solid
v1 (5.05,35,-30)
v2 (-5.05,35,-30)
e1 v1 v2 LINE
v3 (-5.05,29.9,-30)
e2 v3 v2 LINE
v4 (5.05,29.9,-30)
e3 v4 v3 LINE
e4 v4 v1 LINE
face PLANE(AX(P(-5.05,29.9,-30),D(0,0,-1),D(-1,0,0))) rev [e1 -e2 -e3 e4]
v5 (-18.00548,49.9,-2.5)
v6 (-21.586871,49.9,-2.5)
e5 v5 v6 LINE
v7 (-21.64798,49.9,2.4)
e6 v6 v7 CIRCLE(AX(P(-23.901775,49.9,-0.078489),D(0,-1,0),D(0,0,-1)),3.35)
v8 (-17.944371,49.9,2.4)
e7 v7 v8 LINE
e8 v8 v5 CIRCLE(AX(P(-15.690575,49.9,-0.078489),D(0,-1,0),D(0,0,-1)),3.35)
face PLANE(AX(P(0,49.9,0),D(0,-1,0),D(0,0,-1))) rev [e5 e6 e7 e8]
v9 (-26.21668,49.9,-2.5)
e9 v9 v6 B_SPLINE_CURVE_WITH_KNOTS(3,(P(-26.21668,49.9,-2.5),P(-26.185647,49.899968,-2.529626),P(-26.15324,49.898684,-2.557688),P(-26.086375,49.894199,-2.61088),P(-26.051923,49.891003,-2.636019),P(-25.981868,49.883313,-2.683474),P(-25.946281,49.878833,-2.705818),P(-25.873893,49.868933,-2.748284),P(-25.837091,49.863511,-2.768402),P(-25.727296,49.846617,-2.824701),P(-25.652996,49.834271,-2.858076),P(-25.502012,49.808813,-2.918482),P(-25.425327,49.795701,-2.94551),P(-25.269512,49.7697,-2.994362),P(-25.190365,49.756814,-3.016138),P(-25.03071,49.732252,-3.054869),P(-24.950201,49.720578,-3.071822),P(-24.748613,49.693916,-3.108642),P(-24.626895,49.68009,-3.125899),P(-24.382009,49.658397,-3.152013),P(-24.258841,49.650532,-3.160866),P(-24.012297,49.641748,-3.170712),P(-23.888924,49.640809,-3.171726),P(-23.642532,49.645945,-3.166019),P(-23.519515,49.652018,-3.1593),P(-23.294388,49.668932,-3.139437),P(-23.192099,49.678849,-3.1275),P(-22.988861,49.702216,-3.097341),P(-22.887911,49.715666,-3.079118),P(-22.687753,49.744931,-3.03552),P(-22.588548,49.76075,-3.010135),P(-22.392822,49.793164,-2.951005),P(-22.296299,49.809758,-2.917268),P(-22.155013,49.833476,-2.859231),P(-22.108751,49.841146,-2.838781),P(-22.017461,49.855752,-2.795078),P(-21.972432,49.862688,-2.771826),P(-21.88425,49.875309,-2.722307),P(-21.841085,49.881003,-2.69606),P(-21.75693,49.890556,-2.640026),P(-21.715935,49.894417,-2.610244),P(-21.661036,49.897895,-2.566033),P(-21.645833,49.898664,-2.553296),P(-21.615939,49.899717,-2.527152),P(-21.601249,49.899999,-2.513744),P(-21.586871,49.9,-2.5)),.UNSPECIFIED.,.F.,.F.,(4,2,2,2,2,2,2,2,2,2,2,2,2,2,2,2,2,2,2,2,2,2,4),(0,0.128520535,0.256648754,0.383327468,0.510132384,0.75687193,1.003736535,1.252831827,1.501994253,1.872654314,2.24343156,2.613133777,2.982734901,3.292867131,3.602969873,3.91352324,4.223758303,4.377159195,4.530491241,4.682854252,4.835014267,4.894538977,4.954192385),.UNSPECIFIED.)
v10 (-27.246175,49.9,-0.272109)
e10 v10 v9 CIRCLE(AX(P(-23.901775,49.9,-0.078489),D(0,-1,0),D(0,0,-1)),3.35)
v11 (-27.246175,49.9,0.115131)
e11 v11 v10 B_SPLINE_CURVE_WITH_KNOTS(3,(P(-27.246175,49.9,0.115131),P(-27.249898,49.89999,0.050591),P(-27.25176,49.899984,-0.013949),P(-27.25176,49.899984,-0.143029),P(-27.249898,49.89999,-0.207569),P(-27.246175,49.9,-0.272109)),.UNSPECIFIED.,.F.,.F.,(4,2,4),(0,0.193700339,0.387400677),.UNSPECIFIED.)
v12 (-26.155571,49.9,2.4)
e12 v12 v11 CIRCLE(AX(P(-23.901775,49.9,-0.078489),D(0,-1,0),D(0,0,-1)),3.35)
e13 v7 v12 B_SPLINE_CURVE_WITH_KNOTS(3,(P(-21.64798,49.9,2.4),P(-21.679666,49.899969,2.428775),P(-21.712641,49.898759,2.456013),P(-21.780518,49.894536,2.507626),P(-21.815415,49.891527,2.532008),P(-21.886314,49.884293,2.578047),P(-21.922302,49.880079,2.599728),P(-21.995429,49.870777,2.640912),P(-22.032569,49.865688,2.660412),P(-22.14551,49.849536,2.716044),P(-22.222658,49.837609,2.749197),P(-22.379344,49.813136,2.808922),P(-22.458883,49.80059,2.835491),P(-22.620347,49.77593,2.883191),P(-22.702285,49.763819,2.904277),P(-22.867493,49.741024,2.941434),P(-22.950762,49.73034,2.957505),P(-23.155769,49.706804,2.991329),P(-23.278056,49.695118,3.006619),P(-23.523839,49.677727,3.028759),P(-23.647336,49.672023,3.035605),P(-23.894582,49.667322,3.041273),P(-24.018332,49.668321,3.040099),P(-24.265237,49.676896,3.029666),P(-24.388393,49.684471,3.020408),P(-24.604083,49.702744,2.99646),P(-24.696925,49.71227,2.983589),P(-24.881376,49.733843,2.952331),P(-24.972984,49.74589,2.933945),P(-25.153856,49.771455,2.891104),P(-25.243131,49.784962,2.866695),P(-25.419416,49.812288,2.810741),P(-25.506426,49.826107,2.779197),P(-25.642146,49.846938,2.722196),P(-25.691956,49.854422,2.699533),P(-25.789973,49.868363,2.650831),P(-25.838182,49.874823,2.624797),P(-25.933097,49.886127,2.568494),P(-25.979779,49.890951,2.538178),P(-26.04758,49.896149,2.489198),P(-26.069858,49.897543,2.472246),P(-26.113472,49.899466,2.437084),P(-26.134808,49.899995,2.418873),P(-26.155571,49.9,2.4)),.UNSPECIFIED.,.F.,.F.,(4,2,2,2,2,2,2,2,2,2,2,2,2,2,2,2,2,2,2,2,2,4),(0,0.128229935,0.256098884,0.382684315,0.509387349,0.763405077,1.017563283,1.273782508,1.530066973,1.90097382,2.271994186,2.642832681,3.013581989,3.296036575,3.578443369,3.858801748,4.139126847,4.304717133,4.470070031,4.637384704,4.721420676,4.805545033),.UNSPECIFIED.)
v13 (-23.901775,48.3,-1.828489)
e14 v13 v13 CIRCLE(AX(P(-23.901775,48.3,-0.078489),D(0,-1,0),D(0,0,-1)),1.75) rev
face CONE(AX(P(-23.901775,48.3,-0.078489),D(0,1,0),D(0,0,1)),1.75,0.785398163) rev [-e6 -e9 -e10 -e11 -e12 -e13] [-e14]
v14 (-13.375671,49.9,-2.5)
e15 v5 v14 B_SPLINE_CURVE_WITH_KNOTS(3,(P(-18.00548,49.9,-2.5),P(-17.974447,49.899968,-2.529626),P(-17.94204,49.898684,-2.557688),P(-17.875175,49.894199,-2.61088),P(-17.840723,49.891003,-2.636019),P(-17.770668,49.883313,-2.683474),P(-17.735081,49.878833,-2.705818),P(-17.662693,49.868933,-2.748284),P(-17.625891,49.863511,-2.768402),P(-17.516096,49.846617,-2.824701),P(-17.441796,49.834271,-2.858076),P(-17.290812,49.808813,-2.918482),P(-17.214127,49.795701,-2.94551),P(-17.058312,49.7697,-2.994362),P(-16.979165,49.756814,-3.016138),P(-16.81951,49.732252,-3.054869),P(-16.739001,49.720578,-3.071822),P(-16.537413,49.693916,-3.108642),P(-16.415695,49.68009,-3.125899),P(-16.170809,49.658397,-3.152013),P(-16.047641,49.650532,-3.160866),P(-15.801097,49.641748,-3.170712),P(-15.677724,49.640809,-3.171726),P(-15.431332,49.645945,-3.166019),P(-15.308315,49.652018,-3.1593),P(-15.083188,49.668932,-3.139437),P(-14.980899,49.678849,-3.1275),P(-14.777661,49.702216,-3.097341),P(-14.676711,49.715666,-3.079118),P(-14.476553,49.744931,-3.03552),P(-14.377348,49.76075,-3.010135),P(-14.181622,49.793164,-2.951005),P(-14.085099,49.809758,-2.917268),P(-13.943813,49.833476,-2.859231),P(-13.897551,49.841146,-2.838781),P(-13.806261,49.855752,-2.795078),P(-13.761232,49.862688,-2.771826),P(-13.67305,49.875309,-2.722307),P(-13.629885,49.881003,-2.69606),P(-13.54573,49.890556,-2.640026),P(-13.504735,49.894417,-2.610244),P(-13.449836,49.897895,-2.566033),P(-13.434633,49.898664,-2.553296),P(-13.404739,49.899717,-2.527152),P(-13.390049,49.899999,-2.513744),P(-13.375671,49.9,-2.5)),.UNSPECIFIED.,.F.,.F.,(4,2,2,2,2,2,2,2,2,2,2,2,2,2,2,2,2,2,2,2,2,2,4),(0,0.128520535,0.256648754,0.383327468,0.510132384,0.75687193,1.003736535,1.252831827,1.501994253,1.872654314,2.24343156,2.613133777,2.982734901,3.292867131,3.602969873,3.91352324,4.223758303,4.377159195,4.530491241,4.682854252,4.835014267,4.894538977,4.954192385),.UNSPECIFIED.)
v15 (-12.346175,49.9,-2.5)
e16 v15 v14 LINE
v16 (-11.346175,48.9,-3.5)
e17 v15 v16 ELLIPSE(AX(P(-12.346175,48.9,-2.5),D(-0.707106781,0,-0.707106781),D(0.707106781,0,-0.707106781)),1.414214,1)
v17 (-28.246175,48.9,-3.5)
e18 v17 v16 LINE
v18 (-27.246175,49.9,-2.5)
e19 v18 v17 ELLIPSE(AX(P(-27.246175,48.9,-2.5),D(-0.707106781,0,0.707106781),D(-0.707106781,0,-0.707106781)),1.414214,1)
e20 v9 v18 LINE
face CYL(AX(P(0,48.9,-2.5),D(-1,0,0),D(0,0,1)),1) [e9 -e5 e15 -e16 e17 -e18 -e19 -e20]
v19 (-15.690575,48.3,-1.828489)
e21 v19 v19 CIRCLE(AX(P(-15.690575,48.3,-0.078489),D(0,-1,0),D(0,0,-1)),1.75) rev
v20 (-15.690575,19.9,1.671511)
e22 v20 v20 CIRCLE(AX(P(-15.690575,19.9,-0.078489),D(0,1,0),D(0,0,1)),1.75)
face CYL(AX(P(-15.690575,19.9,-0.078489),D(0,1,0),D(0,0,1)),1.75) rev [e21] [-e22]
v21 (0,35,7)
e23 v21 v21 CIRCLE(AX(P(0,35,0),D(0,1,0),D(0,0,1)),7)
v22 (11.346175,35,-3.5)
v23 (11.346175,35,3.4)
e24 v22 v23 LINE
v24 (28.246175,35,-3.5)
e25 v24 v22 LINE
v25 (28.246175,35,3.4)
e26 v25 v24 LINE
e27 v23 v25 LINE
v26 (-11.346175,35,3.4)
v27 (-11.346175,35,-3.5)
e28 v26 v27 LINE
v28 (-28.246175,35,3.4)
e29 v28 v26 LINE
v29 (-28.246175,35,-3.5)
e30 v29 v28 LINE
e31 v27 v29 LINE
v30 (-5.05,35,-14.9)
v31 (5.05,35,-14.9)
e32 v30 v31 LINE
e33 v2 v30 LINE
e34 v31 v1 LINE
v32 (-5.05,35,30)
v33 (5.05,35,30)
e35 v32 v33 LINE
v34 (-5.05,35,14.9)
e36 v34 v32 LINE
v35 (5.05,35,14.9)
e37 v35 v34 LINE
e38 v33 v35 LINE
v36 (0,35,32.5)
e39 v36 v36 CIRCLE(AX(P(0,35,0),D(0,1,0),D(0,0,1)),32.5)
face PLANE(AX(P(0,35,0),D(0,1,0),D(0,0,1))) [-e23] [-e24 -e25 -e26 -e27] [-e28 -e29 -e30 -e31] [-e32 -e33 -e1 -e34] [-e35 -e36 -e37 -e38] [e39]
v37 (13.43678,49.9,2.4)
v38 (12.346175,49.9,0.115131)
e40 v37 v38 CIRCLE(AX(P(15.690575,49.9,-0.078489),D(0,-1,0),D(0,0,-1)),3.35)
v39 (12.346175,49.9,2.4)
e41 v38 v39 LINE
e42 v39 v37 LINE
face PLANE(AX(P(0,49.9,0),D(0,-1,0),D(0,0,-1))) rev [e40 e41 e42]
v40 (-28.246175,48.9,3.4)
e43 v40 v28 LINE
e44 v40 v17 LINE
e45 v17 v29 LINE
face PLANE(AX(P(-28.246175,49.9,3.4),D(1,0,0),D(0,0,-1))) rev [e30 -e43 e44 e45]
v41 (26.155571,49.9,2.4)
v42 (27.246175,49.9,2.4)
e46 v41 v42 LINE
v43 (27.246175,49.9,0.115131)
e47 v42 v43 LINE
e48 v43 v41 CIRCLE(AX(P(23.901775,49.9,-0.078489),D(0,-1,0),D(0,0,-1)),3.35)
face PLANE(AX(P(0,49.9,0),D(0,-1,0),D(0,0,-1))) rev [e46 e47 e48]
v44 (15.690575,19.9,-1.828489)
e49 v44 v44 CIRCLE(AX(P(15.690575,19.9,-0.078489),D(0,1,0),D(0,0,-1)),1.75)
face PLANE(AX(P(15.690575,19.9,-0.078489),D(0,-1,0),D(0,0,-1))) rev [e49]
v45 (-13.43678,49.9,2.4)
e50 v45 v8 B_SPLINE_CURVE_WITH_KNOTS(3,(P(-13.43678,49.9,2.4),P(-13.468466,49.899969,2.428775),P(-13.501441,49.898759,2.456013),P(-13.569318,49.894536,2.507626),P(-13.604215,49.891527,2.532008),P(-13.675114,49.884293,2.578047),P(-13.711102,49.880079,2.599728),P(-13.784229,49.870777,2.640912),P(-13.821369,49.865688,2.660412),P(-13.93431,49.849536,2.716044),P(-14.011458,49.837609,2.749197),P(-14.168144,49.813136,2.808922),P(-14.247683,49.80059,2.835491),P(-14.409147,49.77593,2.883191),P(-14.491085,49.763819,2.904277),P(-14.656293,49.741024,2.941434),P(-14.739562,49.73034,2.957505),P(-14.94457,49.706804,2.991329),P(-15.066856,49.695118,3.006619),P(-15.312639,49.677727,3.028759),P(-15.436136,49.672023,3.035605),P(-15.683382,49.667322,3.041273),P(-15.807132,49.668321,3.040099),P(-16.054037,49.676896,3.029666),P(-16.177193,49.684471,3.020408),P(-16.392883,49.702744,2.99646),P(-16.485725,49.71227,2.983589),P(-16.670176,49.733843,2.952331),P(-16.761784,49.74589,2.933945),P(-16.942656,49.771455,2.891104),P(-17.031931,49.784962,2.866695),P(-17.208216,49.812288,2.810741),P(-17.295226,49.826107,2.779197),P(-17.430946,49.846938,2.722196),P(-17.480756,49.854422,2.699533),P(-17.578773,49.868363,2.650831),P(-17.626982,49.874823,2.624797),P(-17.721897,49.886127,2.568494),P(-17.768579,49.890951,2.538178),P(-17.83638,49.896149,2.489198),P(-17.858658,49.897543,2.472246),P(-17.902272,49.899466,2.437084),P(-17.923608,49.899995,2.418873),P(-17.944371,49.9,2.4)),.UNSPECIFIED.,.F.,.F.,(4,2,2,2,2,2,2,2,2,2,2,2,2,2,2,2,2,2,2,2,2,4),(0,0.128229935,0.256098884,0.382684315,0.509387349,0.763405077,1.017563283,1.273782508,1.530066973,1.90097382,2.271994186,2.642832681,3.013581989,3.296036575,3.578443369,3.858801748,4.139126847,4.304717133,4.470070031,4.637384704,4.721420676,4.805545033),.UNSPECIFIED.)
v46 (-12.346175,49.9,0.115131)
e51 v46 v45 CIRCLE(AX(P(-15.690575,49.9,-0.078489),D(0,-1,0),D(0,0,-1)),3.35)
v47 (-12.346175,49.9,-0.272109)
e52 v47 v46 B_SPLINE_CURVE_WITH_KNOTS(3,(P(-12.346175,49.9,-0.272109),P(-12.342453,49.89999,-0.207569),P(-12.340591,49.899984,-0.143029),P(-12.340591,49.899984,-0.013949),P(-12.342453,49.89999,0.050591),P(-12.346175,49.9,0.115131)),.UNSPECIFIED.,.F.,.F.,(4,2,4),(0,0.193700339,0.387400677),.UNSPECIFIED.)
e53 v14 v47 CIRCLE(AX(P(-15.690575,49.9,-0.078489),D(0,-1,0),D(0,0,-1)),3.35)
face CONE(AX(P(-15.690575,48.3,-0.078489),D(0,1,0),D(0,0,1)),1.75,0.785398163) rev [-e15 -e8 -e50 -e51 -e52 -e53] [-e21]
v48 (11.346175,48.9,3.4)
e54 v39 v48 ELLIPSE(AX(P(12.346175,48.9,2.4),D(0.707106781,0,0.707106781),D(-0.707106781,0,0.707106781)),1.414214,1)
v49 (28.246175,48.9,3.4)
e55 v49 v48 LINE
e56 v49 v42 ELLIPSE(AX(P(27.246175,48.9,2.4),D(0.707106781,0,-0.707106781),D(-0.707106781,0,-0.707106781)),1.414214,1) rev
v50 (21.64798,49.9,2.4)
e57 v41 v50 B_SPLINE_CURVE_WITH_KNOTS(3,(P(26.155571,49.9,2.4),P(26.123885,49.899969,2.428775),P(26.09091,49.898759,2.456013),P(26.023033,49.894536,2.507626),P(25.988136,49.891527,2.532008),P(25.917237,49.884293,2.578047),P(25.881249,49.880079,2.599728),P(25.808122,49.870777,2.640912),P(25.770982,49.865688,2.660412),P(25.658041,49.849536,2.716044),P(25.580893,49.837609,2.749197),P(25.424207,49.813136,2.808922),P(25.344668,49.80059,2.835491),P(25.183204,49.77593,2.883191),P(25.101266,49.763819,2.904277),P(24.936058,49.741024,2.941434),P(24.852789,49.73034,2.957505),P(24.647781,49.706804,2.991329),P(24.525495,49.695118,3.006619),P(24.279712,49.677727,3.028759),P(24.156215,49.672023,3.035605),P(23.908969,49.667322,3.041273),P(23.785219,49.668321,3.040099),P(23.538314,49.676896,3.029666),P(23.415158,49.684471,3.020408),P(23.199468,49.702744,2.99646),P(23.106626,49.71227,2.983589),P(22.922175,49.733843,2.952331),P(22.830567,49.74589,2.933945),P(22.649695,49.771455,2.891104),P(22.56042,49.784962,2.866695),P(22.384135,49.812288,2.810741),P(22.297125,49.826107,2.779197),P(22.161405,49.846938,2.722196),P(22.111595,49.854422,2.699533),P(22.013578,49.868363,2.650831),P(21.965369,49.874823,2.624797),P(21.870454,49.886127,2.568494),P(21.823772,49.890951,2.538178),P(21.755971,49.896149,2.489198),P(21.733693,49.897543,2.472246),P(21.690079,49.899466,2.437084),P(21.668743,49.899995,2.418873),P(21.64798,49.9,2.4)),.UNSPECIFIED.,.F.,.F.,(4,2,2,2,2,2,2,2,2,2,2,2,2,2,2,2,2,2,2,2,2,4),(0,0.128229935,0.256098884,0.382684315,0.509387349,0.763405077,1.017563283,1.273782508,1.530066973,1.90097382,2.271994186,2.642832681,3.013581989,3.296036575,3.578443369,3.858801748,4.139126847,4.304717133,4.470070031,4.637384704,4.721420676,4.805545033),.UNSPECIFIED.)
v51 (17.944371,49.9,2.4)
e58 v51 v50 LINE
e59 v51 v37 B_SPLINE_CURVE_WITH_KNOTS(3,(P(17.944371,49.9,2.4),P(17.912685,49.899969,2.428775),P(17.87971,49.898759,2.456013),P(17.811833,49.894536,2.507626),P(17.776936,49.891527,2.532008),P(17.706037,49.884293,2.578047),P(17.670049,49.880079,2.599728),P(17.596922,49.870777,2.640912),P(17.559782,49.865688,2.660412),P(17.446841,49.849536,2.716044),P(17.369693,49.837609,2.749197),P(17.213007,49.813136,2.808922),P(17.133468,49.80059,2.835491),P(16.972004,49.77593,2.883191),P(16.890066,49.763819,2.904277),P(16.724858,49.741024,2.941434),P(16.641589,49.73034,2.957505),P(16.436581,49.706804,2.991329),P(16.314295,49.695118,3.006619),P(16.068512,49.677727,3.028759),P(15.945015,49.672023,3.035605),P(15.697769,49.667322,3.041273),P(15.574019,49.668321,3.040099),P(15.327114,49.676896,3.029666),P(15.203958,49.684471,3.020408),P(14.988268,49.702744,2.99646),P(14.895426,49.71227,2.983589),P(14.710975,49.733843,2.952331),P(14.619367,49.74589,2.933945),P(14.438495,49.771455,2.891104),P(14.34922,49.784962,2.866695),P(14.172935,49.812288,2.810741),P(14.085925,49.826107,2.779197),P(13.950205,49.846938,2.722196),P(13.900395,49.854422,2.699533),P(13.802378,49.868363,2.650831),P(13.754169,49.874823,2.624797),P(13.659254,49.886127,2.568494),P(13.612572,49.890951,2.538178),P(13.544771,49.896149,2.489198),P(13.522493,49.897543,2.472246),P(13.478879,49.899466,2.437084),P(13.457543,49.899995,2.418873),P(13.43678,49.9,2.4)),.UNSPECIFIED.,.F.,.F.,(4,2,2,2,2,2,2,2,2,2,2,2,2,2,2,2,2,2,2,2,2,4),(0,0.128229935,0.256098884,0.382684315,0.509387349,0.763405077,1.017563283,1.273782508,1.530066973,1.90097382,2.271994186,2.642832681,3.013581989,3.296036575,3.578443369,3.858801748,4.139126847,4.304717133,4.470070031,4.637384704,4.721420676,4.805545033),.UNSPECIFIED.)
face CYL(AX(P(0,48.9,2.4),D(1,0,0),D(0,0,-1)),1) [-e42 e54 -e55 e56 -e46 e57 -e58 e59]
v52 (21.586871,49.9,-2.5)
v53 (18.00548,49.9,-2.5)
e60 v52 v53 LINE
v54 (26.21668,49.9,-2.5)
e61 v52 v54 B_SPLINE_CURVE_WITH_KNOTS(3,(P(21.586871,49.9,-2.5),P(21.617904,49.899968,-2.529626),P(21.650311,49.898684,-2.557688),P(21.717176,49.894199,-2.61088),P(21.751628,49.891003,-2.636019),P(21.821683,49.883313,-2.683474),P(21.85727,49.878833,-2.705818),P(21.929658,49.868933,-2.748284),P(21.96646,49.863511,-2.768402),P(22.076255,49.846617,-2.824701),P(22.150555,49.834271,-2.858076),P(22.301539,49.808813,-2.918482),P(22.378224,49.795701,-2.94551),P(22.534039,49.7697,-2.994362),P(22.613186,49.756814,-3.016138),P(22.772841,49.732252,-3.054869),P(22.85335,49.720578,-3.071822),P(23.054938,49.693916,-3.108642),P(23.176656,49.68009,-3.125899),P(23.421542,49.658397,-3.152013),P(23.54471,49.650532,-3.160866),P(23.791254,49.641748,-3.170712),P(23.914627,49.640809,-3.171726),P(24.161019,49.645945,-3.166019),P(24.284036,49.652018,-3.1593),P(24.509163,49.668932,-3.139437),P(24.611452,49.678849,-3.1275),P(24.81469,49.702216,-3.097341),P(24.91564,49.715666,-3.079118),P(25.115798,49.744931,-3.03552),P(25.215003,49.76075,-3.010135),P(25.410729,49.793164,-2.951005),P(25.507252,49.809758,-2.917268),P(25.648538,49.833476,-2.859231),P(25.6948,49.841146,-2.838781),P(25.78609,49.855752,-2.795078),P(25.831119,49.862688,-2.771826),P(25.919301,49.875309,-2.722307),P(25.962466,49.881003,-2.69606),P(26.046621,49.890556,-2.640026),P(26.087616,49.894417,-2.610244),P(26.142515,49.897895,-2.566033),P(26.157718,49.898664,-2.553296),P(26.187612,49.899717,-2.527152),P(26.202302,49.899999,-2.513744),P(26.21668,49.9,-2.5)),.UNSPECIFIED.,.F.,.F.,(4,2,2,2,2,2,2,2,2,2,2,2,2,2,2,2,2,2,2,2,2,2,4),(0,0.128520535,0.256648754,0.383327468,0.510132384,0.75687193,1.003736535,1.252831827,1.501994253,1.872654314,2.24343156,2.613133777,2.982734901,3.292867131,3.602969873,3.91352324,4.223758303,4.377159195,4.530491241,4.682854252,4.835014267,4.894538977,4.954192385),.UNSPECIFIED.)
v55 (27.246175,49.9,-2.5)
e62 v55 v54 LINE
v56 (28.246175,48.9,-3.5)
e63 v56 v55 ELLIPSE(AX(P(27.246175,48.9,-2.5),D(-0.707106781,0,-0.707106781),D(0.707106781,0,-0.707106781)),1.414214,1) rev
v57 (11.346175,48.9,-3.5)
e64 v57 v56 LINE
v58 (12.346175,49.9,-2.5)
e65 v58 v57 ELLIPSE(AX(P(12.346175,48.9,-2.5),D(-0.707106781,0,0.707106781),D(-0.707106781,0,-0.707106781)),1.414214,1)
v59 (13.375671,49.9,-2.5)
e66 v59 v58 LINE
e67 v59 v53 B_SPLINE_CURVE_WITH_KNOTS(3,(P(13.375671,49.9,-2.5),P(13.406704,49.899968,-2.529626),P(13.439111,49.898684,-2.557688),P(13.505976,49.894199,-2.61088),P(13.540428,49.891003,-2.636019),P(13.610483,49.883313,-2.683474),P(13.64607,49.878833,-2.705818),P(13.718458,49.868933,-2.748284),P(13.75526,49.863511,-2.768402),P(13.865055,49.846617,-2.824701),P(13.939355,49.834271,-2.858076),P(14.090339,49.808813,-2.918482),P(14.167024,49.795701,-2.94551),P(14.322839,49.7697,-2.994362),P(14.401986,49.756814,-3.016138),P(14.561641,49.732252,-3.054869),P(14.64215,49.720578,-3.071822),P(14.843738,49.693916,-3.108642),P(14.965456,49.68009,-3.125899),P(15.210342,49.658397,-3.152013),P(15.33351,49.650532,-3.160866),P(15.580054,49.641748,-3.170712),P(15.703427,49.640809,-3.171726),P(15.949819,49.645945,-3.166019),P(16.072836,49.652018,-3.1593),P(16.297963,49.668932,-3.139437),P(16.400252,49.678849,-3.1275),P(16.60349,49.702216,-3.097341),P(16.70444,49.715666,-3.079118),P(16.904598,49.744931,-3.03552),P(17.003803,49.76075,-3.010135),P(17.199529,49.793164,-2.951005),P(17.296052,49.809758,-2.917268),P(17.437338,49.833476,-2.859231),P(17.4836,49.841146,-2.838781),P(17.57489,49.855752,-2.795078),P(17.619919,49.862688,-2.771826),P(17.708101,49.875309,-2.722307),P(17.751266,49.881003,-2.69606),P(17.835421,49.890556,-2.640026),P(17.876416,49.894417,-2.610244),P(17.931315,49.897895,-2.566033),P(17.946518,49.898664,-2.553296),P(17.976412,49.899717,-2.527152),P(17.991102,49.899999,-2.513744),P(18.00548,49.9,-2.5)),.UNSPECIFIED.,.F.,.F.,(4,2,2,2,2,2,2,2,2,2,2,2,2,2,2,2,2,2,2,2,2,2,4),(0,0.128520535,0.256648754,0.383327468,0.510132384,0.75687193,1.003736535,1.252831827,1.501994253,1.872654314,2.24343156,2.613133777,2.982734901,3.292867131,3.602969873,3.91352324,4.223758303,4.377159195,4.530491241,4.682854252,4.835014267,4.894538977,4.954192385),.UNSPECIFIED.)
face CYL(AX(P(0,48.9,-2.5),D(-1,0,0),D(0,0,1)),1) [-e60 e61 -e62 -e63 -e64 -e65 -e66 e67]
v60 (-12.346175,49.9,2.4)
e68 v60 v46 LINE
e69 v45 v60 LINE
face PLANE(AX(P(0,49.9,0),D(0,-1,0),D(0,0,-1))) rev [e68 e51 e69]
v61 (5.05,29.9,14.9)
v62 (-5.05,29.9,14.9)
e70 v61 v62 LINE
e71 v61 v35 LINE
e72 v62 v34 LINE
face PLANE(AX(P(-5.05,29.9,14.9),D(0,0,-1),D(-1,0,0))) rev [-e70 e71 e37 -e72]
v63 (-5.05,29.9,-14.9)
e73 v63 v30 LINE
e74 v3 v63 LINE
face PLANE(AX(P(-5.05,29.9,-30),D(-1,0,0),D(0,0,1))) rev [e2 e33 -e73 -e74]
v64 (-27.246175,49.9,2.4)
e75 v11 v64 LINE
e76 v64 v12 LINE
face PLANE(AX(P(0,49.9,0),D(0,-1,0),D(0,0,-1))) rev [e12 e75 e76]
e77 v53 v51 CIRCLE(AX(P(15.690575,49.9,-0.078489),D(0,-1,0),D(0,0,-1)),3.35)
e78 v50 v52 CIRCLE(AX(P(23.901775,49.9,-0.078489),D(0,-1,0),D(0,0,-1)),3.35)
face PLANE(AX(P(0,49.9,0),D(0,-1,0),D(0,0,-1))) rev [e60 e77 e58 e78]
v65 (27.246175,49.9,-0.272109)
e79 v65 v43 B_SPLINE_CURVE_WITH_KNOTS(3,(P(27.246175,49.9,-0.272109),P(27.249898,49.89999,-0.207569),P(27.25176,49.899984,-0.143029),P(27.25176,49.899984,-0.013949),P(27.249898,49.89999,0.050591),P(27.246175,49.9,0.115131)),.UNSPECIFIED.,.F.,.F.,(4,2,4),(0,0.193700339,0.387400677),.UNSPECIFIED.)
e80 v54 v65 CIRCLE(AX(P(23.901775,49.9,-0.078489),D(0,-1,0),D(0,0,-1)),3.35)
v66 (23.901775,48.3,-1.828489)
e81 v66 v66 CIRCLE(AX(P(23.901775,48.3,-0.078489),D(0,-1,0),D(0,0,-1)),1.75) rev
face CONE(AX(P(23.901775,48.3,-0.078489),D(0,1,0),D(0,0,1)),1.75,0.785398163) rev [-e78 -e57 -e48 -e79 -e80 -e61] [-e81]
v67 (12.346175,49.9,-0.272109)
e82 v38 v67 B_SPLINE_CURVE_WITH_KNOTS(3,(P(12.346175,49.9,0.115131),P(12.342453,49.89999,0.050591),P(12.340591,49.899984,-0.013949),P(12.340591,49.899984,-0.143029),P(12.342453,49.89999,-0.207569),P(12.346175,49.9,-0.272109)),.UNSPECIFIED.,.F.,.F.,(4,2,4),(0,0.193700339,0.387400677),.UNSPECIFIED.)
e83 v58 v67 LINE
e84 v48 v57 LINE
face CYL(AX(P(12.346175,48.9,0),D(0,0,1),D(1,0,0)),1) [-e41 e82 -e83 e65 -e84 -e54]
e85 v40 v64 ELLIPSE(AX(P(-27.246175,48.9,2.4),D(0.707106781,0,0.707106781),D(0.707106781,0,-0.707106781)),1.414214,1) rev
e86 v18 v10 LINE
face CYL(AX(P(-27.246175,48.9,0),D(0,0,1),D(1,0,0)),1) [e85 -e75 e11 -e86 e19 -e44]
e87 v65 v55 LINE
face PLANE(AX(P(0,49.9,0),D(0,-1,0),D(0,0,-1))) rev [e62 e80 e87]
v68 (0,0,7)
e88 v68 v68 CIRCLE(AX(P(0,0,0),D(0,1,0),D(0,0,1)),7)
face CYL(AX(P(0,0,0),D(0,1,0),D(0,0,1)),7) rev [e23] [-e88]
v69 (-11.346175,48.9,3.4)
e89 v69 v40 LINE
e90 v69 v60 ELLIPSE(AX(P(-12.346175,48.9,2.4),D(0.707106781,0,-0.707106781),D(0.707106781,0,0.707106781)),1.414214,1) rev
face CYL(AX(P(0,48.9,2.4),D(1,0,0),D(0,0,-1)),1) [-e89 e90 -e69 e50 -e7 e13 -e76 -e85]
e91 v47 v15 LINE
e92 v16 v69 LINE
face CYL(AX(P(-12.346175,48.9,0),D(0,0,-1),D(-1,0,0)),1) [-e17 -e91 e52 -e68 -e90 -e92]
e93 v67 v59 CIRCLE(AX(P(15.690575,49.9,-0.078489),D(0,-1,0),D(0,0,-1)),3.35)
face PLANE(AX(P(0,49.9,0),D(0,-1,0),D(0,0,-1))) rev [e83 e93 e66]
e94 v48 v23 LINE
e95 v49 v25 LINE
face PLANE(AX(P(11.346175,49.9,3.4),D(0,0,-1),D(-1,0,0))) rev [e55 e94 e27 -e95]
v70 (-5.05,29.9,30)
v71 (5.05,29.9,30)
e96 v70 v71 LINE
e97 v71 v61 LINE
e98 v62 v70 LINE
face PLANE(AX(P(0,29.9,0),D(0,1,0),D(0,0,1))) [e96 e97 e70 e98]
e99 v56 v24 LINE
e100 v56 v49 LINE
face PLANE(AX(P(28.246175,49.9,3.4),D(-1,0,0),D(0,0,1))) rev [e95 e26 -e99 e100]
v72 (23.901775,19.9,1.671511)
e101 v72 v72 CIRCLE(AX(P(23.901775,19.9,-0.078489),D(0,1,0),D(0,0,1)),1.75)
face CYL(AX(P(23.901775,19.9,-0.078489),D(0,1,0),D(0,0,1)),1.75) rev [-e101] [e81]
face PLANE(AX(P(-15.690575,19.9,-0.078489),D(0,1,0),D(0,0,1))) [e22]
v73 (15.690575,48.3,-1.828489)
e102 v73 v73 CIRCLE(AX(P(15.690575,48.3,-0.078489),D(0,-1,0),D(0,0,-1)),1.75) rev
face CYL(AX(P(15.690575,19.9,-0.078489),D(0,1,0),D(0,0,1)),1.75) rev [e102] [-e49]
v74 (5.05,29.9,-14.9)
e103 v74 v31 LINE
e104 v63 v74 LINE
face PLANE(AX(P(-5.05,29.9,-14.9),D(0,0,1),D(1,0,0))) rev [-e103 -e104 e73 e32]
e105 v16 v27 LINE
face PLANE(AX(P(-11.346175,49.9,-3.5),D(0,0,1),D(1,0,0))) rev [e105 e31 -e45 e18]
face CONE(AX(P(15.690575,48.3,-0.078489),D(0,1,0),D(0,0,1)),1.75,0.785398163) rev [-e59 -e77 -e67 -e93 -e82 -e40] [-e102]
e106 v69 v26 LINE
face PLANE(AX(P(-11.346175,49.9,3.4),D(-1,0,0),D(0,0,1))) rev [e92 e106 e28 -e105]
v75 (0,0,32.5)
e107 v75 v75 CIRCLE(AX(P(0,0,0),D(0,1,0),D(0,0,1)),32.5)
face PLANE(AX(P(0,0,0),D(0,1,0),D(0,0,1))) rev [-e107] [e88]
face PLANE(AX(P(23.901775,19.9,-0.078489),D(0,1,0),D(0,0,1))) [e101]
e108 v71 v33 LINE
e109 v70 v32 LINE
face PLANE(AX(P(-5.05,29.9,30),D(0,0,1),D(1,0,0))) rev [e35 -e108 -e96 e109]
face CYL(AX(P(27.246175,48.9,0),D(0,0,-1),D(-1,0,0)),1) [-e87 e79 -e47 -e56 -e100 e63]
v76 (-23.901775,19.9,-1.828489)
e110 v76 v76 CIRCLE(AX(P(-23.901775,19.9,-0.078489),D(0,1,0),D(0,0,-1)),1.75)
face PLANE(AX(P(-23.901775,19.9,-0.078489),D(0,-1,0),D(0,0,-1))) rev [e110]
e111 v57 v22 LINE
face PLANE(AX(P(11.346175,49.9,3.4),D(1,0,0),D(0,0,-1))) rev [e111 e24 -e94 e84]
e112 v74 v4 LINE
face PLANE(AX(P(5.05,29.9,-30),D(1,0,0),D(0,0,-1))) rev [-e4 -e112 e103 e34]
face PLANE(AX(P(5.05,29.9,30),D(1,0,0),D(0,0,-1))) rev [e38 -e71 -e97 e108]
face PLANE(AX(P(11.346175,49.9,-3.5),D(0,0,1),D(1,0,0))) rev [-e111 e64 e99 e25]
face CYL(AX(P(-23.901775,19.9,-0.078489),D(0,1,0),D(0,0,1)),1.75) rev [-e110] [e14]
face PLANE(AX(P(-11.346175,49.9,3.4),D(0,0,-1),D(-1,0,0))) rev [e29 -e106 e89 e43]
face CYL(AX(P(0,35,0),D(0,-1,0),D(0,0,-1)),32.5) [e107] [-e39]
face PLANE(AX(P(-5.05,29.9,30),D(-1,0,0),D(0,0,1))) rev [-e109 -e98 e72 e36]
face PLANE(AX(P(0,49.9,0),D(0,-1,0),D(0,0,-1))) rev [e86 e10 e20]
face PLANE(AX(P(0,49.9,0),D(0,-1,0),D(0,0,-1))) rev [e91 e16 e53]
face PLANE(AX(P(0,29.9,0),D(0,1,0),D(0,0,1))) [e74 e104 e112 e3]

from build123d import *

# Parameters (mm, degrees)
SKETCH1_R           = 32.5
BOSS_EXTRUDE1_DEPTH = 35
SKETCH2_W           = 10.1
SKETCH2_H           = 15.1
CUT_EXTRUDE1_DEPTH  = 5.1
SKETCH3_R           = 7
CUT_EXTRUDE2_DEPTH  = 58.771100041
SKETCH4_W           = 16.9
SKETCH4_H           = 6.9
BOSS_EXTRUDE2_DEPTH = 14.9
FILLET2_R           = 1
SKETCH5_R           = 1.75
CUT_EXTRUDE3_DEPTH  = 30
CHAMFER1_SIZE       = 1.6


with BuildPart() as part:
    # Sketch1 → Boss-Extrude1 (new body)
    with BuildSketch(Plane(origin=(0, 0, 0), x_dir=(1, 0, 0), z_dir=(0, 1, 0))):
        with Locations(Location((0, 0, 0), (0, 0, 270))):
            Circle(SKETCH1_R)
    extrude(amount=BOSS_EXTRUDE1_DEPTH)

    # Sketch2 → Cut-Extrude1 (cut)
    with BuildSketch(Plane(origin=(0, 35, 0), x_dir=(1, 0, 0), z_dir=(0, 1, 0))):
        with Locations((0, 22.45)):
            Rectangle(SKETCH2_W, SKETCH2_H)
        with Locations((0, -22.45)):
            Rectangle(SKETCH2_W, SKETCH2_H)
    extrude(amount=-CUT_EXTRUDE1_DEPTH, mode=Mode.SUBTRACT)

    # Sketch3 → Cut-Extrude2 (cut, through all)
    with BuildSketch(Plane(origin=(0, 35, 0), x_dir=(1, 0, 0), z_dir=(0, 1, 0))):
        with Locations(Location((0, 0, 0), (0, 0, 270))):
            Circle(SKETCH3_R)
    extrude(amount=-CUT_EXTRUDE2_DEPTH, mode=Mode.SUBTRACT)

    # Sketch4 → Boss-Extrude2 (add)
    with BuildSketch(Plane(origin=(0, 35, 0), x_dir=(1, 0, 0), z_dir=(0, 1, 0))):
        with Locations((19.796175473, 0.05)):
            Rectangle(SKETCH4_W, SKETCH4_H)
        with Locations((-19.796175473, 0.05)):
            Rectangle(SKETCH4_W, SKETCH4_H)
    extrude(amount=BOSS_EXTRUDE2_DEPTH)

    # Fillet2
    fillet2_edges = [part.edges().sort_by_distance(p)[0] for p in [
        (28.246175473, 49.9, -0.05),
        (19.796175473, 49.9, -3.5),
        (11.346175473, 49.9, -0.05),
        (19.796175473, 49.9, 3.4),
        (-19.796175473, 49.9, 3.4),
        (-11.346175473, 49.9, -0.05),
        (-19.796175473, 49.9, -3.5),
        (-28.246175473, 49.9, -0.05),
    ]]
    fillet(fillet2_edges, radius=FILLET2_R)

    # Sketch5 → Cut-Extrude3 (cut)
    with BuildSketch(Plane(origin=(0, 49.9, 0), x_dir=(1, 0, 0), z_dir=(0, 1, 0))):
        with Locations(Location((23.901775473, 0.078488913, 0), (0, 0, 270))):
            Circle(SKETCH5_R)
        with Locations(Location((15.690575474, 0.078488913, 0), (0, 0, 90))):
            Circle(SKETCH5_R)
        with Locations(Location((-15.690575474, 0.078488913, 0), (0, 0, 270))):
            Circle(SKETCH5_R)
        with Locations(Location((-23.901775473, 0.078488913, 0), (0, 0, 90))):
            Circle(SKETCH5_R)
    extrude(amount=-CUT_EXTRUDE3_DEPTH, mode=Mode.SUBTRACT)

    # Chamfer1
    # the kernel refuses this chamfer: 1.6 mm, written as the material it takes off along each edge
    with BuildSketch(Plane(origin=(23.901775473, 49.9, -0.078488913), x_dir=(0, 0, 1), z_dir=(-1, 0, 0))) as chamfer1_piece_1:
        Polygon((1.75 + CHAMFER1_SIZE, 0), (1.75, -CHAMFER1_SIZE), (1.75, 0), align=None)
    revolve(axis=Axis((23.901775473, 49.9, -0.078488913), (0, 1, 0)), mode=Mode.SUBTRACT)
    with BuildSketch(Plane(origin=(-15.690575474, 49.9, -0.078488913), x_dir=(0, 0, 1), z_dir=(-1, 0, 0))) as chamfer1_piece_2:
        Polygon((1.75 + CHAMFER1_SIZE, 0), (1.75, -CHAMFER1_SIZE), (1.75, 0), align=None)
    revolve(axis=Axis((-15.690575474, 49.9, -0.078488913), (0, 1, 0)), mode=Mode.SUBTRACT)
    with BuildSketch(Plane(origin=(15.690575474, 49.9, -0.078488913), x_dir=(0, 0, -1), z_dir=(1, 0, 0))) as chamfer1_piece_3:
        Polygon((1.75 + CHAMFER1_SIZE, 0), (1.75, -CHAMFER1_SIZE), (1.75, 0), align=None)
    revolve(axis=Axis((15.690575474, 49.9, -0.078488913), (0, 1, 0)), mode=Mode.SUBTRACT)
    with BuildSketch(Plane(origin=(-23.901775473, 49.9, -0.078488913), x_dir=(0, 0, -1), z_dir=(1, 0, 0))) as chamfer1_piece_4:
        Polygon((1.75 + CHAMFER1_SIZE, 0), (1.75, -CHAMFER1_SIZE), (1.75, 0), align=None)
    revolve(axis=Axis((-23.901775473, 49.9, -0.078488913), (0, 1, 0)), mode=Mode.SUBTRACT)


solid = part.part
